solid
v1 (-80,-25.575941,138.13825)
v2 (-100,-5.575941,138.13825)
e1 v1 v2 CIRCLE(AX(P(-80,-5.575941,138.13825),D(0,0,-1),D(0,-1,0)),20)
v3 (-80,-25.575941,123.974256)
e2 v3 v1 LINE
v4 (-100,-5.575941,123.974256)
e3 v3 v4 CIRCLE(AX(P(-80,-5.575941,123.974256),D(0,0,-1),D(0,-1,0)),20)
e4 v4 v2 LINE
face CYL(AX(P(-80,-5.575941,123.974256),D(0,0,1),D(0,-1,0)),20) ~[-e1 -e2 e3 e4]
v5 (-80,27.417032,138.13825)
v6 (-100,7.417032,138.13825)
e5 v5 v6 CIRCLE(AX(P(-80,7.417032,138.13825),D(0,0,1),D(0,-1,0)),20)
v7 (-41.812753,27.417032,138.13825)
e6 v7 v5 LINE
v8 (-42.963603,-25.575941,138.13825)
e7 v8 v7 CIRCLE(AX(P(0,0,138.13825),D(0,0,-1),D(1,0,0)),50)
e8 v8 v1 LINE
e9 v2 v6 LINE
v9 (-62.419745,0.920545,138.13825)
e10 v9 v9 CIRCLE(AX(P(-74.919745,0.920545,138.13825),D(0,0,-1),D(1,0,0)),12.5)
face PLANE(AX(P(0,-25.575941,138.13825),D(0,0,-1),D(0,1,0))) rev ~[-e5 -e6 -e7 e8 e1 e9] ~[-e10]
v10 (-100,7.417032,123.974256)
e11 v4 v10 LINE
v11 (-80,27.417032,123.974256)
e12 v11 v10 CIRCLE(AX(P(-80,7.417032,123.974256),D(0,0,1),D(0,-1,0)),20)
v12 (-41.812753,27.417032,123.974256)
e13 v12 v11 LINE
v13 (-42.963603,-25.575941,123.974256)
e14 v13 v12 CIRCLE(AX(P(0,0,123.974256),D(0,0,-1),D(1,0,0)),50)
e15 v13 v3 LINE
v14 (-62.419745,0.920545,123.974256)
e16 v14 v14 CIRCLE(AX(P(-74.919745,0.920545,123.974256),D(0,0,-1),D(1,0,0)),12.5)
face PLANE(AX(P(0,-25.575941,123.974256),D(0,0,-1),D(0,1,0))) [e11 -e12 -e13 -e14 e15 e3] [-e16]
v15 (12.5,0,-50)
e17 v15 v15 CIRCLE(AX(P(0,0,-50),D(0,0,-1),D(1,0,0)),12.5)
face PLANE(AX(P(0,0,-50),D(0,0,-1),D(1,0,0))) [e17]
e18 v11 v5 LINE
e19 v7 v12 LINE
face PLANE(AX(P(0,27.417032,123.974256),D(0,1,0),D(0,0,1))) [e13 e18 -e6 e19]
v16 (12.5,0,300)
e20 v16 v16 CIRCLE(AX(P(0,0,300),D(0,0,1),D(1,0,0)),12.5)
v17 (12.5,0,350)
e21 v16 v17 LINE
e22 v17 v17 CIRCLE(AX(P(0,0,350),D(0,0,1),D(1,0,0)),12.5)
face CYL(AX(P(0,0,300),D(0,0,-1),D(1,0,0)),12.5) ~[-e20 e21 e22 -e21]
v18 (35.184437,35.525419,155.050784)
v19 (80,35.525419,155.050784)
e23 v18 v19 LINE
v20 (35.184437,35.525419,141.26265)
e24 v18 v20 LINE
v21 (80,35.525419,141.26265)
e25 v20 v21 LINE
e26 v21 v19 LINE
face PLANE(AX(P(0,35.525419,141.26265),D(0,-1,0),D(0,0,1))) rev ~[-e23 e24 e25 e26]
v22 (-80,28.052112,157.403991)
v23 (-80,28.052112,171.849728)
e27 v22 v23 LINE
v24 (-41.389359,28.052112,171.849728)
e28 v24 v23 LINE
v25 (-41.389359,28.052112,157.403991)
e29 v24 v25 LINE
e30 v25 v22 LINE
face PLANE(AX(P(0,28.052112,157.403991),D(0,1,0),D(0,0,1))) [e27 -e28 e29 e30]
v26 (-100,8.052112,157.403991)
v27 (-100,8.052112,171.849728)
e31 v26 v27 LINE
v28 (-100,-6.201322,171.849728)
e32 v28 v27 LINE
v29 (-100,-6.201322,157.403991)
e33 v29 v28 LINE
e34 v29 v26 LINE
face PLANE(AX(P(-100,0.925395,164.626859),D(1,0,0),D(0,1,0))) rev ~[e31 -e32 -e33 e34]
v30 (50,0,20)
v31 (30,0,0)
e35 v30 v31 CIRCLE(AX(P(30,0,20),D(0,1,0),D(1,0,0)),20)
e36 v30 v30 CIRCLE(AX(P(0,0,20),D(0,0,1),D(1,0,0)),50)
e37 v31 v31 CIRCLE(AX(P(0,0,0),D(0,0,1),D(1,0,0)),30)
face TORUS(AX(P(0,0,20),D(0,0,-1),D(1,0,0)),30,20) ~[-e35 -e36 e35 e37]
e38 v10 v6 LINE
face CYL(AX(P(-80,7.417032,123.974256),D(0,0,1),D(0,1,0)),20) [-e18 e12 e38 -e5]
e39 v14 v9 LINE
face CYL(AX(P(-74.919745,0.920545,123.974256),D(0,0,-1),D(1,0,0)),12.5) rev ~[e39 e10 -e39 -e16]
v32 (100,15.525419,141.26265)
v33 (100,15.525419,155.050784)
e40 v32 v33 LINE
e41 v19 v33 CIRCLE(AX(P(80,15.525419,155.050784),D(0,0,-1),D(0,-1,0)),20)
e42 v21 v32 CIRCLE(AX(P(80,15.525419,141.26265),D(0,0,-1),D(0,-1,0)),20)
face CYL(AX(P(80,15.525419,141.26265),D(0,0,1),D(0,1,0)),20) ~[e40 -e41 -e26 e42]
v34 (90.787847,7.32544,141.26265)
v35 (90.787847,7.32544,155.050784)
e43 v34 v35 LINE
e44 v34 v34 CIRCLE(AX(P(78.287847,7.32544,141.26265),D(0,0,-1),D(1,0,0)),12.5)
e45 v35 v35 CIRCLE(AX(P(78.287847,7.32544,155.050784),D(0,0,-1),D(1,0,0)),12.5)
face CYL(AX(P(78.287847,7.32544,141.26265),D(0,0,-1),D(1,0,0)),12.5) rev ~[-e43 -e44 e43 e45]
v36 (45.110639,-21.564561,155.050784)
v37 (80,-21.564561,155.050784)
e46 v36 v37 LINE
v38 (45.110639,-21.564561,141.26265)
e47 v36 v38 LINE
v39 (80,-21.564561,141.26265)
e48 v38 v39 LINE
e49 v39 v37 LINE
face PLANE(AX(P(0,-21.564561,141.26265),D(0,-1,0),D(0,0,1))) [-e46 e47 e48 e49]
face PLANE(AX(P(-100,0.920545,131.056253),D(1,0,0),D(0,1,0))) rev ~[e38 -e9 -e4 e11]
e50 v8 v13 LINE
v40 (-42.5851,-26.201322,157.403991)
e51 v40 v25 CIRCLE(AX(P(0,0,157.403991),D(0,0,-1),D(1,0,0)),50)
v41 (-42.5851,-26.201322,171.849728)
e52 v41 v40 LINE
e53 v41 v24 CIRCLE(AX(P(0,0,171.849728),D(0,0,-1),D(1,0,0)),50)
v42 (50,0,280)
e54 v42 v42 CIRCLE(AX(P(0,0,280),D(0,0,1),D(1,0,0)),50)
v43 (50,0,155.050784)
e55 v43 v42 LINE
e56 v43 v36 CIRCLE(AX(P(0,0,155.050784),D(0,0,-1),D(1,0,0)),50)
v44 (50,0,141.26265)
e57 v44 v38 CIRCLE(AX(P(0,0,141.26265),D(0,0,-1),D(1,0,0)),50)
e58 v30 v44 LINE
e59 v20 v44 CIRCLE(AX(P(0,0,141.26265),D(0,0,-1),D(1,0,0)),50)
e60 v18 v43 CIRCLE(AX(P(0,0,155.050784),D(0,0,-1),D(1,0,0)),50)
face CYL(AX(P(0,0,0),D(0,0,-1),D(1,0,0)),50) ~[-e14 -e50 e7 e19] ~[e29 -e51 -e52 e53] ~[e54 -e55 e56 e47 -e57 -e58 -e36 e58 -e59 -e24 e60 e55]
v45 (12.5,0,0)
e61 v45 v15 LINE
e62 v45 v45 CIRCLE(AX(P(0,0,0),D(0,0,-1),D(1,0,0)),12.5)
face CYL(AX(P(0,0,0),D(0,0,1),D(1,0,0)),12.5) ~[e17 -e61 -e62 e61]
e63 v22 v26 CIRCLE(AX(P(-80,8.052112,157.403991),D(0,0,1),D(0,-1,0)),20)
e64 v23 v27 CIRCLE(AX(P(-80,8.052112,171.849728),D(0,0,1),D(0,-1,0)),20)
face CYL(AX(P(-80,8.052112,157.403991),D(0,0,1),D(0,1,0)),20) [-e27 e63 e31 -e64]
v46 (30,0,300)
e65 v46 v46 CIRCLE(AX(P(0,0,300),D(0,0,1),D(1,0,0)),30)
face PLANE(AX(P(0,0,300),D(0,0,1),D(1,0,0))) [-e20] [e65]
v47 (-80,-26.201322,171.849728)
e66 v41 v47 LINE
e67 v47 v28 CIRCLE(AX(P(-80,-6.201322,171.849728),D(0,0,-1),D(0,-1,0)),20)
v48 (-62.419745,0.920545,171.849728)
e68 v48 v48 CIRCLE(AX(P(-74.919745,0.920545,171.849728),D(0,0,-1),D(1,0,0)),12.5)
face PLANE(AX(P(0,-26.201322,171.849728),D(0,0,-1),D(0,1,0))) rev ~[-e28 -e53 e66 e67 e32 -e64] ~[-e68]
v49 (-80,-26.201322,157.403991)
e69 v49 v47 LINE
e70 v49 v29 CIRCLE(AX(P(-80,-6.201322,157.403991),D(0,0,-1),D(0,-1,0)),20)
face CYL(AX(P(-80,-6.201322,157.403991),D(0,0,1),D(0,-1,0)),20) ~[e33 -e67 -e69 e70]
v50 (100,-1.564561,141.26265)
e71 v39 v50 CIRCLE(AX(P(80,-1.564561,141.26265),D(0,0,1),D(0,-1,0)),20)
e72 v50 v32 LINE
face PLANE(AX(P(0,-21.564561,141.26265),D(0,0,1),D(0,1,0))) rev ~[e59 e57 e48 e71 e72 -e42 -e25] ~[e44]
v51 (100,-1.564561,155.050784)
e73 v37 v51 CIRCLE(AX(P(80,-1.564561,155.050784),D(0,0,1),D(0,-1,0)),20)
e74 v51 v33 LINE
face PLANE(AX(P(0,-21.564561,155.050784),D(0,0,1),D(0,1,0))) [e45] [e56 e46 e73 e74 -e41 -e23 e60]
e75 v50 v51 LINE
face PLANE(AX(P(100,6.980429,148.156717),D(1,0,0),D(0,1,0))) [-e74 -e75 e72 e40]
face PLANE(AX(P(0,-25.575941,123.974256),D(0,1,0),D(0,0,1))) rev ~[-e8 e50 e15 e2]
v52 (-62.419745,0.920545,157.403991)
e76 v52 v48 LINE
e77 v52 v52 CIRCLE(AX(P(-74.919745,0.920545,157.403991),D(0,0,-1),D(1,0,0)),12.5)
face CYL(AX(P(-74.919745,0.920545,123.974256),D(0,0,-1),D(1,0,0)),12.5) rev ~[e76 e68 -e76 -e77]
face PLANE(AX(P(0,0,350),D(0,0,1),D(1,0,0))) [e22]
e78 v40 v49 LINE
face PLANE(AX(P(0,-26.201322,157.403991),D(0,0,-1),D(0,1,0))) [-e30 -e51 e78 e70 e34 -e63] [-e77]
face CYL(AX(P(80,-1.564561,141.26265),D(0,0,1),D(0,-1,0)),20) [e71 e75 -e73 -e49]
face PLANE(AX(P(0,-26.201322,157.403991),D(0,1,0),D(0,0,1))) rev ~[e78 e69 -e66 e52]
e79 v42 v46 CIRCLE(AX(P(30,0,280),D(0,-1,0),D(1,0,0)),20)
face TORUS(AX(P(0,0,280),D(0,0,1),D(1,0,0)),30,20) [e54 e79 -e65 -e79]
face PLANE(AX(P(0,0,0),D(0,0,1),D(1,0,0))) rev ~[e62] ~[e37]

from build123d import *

# Parameters (mm, degrees)
F0_R      = 50
F1_DEPTH  = 300
F2_W      = 54.253433831
F2_H      = 14.4457370043
F2_W_2    = 52.9929734766
F2_H_2    = 14.163993299
F3_DEPTH  = 100
F4_W      = 57.0899797603
F4_H      = 13.7881338596
F5_DEPTH  = 100
F6_R      = 12.5
F7_DEPTH  = 158.7383495102
F8_R      = 12.5
F9_DEPTH  = 176.0267437825
F10_R     = 20
F11_R     = 20
F12_R     = 12.5
F13_DEPTH = 50
F14_R     = 12.5
F15_DEPTH = 50


with BuildPart() as f1:
    # F0 (on Top) → F1 (new body)
    with BuildSketch(Plane.XY):
        Circle(F0_R)
    extrude(amount=F1_DEPTH)

    # F2 (on Right) → F3 (join)
    with BuildSketch(Plane.YZ):
        with Locations((0.9253951721, 164.6268591285)):
            Rectangle(F2_W, F2_H)
        with Locations((0.9205453098, 131.056252867)):
            Rectangle(F2_W_2, F2_H_2)
    extrude(amount=-F3_DEPTH)

    # F4 (on Right) → F5 (join)
    with BuildSketch(Plane.YZ):
        with Locations((6.9804289378, 148.1567174196)):
            Rectangle(F4_W, F4_H)
    extrude(amount=F5_DEPTH)

    # F6 (on face) → F7 (cut, through all)
    with BuildSketch(Plane(origin=(0, 0, 141.2626504898), x_dir=(1, 0, 0), z_dir=(0, 0, -1))):
        with Locations((78.2878473401, -7.3254397139)):
            Circle(F6_R)
    extrude(amount=-F7_DEPTH, mode=Mode.SUBTRACT)

    # F8 (on face) → F9 (cut, through all)
    with BuildSketch(Plane(origin=(0, 0, 123.9742562175), x_dir=(1, 0, 0), z_dir=(0, 0, -1))):
        with Locations((-74.919745326, -0.9205453098)):
            Circle(F8_R)
    extrude(amount=-F9_DEPTH, mode=Mode.SUBTRACT)

    # F10
    f10_edges = [f1.edges().sort_by_distance(p)[0] for p in [
        (-50, 0, 300),
        (-50, 0, 0),
    ]]
    fillet(f10_edges, radius=F10_R)

    # F11
    f11_edges = [f1.edges().sort_by_distance(p)[0] for p in [
        (100, 35.525419, 148.156717),
        (100, -21.564561, 148.156717),
        (-100, -25.575941, 131.056253),
        (-100, 27.417032, 131.056253),
        (-100, -26.201322, 164.626859),
        (-100, 28.052112, 164.626859),
    ]]
    fillet(f11_edges, radius=F11_R)

    # F12 (on face) → F13 (join)
    with BuildSketch(Plane.XY.offset(300)):
        Circle(F12_R)
    extrude(amount=F13_DEPTH)

    # F14 (on face) → F15 (join)
    with BuildSketch(Plane(origin=(0, 0, 0), x_dir=(1, 0, 0), z_dir=(0, 0, -1))):
        Circle(F14_R)
    extrude(amount=F15_DEPTH)


solid = f1.part
